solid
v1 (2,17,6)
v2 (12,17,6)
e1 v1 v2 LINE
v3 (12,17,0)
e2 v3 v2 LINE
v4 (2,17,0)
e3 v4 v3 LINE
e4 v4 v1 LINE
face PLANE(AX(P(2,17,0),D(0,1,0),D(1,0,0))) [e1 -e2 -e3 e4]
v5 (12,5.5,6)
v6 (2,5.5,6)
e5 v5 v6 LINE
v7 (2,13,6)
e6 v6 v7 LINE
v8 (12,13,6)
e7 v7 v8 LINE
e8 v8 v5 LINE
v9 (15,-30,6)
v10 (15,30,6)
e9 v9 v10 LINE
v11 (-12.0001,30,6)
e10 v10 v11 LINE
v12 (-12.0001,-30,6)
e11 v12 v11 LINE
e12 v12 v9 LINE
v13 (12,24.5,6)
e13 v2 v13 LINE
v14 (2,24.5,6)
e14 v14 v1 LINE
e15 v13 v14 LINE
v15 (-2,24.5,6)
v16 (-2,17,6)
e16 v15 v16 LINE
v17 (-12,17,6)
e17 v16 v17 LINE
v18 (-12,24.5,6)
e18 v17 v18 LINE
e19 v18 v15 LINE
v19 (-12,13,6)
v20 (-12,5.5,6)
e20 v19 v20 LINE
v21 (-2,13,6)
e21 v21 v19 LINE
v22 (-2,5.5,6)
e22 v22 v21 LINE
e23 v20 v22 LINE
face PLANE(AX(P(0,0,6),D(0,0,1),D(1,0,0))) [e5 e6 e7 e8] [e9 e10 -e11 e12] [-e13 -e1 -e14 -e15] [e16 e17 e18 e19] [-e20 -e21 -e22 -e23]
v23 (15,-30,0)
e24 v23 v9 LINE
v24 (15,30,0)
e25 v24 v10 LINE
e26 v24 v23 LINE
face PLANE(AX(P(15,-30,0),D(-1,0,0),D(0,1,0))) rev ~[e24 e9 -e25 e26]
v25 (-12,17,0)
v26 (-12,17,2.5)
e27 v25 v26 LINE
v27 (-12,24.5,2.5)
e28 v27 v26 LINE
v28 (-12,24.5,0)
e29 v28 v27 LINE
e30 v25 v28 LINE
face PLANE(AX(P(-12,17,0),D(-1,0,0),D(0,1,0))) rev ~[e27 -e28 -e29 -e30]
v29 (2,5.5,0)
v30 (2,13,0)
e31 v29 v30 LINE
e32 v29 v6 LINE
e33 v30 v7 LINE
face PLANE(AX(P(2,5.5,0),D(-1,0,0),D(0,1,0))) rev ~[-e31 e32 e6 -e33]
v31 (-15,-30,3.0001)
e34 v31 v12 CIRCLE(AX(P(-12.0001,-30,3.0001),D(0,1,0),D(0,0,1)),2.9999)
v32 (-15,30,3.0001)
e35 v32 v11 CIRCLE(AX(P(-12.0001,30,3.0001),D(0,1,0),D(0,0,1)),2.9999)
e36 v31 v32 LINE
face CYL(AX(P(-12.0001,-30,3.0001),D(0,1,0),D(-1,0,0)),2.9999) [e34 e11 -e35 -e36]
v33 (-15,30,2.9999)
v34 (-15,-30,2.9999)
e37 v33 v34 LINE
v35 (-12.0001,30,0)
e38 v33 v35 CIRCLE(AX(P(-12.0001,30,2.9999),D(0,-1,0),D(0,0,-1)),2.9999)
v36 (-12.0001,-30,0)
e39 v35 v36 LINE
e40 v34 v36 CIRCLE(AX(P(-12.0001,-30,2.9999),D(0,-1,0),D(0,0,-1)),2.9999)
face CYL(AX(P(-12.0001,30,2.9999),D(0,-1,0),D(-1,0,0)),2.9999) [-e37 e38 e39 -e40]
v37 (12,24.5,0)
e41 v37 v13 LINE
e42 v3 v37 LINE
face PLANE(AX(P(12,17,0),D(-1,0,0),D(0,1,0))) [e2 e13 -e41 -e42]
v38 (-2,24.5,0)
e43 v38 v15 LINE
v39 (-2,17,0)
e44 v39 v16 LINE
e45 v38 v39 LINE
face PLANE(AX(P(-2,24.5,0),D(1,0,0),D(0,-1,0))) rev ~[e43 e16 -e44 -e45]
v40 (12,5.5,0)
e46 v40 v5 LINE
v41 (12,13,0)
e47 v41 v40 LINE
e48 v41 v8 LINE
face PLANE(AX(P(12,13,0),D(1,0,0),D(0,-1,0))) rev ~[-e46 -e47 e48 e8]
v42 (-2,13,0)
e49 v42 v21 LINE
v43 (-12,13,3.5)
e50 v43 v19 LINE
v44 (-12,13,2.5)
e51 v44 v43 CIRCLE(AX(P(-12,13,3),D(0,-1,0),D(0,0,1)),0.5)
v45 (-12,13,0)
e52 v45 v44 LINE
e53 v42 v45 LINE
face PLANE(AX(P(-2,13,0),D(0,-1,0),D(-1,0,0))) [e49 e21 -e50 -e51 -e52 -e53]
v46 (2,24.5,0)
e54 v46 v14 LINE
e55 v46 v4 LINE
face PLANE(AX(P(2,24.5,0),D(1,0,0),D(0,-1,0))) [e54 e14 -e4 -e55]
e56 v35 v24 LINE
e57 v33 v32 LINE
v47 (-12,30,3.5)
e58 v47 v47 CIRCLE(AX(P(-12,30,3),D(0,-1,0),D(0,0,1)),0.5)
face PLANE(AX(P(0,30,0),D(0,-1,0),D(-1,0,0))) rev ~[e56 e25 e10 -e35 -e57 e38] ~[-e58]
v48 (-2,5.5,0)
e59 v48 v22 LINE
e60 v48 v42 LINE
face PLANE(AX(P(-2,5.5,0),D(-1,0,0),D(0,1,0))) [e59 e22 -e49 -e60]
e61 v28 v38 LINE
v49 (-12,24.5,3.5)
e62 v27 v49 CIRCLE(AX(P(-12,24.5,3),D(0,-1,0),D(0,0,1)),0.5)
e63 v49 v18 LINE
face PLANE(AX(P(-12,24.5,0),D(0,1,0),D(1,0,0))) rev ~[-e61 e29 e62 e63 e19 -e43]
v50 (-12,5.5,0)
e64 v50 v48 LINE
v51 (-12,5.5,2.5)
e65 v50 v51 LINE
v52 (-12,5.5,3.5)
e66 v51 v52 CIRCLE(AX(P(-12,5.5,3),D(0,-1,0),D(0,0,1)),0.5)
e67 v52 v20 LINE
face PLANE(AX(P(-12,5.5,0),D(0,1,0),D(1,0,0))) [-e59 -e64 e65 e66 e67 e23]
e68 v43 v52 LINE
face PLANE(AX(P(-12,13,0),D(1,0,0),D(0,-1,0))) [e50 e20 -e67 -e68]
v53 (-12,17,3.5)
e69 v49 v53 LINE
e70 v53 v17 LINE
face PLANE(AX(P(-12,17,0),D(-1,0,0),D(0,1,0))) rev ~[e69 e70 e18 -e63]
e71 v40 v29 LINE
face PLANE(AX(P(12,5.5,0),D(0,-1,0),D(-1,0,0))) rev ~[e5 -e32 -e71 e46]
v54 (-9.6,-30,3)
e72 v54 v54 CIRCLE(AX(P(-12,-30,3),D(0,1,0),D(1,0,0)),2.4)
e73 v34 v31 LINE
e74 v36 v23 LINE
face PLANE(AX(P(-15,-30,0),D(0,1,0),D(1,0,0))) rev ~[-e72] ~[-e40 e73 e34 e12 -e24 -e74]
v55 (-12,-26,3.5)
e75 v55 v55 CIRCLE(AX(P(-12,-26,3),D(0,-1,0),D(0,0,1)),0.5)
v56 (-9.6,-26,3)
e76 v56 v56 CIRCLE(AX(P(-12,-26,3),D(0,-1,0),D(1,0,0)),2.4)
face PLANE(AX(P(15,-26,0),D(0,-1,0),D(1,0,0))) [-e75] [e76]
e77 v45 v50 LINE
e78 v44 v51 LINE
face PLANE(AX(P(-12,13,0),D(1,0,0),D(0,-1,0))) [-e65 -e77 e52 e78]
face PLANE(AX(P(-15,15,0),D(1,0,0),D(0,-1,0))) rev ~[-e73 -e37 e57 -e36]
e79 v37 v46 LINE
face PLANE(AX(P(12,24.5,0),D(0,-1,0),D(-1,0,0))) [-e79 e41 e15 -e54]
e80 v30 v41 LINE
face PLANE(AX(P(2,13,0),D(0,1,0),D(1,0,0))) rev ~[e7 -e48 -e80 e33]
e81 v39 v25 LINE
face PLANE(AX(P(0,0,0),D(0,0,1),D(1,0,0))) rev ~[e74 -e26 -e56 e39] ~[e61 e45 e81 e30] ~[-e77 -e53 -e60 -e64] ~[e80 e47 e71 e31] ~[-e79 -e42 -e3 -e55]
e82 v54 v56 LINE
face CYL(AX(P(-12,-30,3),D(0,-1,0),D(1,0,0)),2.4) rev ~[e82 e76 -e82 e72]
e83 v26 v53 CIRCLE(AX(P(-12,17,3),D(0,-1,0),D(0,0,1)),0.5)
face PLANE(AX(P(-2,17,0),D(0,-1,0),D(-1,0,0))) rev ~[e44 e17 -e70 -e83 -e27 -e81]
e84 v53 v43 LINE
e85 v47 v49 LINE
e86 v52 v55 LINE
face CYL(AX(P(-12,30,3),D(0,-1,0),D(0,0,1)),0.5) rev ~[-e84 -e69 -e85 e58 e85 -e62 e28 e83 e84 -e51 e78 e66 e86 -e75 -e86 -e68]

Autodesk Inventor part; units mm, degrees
ref_plane "YZ Plane" through (0, 0, 0) normal (1, 0, 0) x (0, 1, 0)
ref_plane "XZ Plane" through (0, 0, 0) normal (0, 1, 0) x (-1, 0, 0)
ref_plane "XY Plane" through (0, 0, 0) normal (0, 0, 1) x (1, 0, 0)
sketch "Náčrt1" plane through (0, 0, 0) normal (0, 0, 1) x (1, 0, 0)
  line L0 (-15, -30) -> (15, -30)
  line L1 (15, -30) -> (15, 30)
  line L2 (15, 30) -> (-15, 30)
  line L3 (-15, 30) -> (-15, -30)
  line L4 (-15, -30) -> (15, 30) construction
  line L5 (15, -30) -> (-15, 30) construction
  line L6 (0, 30) -> (0, 0)
  line L7 (-15, 15) -> (15, 15)
  line L8 (2, 17) -> (12, 17)
  line L9 (12, 17) -> (12, 24.5)
  line L10 (12, 24.5) -> (2, 24.5)
  line L11 (2, 24.5) -> (2, 17)
  line L12 (-2, 17) -> (-12, 17)
  line L13 (-12, 17) -> (-12, 24.5)
  line L14 (-12, 24.5) -> (-2, 24.5)
  line L15 (-2, 24.5) -> (-2, 17)
  line L16 (2, 13) -> (12, 13)
  line L17 (12, 13) -> (12, 5.5)
  line L18 (12, 5.5) -> (2, 5.5)
  line L19 (2, 5.5) -> (2, 13)
  line L20 (-12, 5.5) -> (-2, 5.5)
  line L21 (-12, 13) -> (-12, 5.5)
  line L22 (-2, 13) -> (-12, 13)
  line L23 (-2, 5.5) -> (-2, 13)
  dimension "d0" = 30
  dimension "d1" = 60
  dimension "d2" = 15
  dimension "d3" = 10
  dimension "d4" = 7.5
  dimension "d5" = 2
  dimension "d6" = 2
extrude "Vysunutí1" add sketch "Náčrt1" along normal blind 6
sketch "Náčrt2" plane through (15, -30, 0) normal (0, -1, 0) x (1, 0, 0)
  circle A0 centre (-27, 3) radius 2.4
  line L0 (-30, 0) -> (-30, 6) projected
  line L1 (-30, 6) -> (0, 6) projected
  line L2 (-30, 0) -> (0, 0) projected
  line L3 (-27, 0) -> (-27, 6) projected
  point P0 (-15, 0)
  point P1 (-30, 2)
  point P2 (-30, 4)
  dimension "d13" = 4.8
  dimension "d14" = 3
  dimension "d15" = 3
  dimension "d16" = 3
extrude "Vysunutí2" cut sketch "Náčrt2" against normal blind 4 contours A0 L3 | L3 A0
full round fillet "Plné kulaté zaoblení1" first side at (0.6667, -18.1667, 6) centre faces at (-15, 10, 2) second side at (0.6667, -18.1667, 0)
sketch "Náčrt3" plane through (15, 30, 6) normal (0, 1, 0) x (1, 0, 0)
  arc A0 (-27, 6) -> (-27, 0) centre (-27, 3) ccw projected
  point P0 (-15, 6)
hole "Díra1" at (-12, 30, 3) direction (0, -1, 0) diameter 1 end through all
properties part number "dvere_3D tisk"
